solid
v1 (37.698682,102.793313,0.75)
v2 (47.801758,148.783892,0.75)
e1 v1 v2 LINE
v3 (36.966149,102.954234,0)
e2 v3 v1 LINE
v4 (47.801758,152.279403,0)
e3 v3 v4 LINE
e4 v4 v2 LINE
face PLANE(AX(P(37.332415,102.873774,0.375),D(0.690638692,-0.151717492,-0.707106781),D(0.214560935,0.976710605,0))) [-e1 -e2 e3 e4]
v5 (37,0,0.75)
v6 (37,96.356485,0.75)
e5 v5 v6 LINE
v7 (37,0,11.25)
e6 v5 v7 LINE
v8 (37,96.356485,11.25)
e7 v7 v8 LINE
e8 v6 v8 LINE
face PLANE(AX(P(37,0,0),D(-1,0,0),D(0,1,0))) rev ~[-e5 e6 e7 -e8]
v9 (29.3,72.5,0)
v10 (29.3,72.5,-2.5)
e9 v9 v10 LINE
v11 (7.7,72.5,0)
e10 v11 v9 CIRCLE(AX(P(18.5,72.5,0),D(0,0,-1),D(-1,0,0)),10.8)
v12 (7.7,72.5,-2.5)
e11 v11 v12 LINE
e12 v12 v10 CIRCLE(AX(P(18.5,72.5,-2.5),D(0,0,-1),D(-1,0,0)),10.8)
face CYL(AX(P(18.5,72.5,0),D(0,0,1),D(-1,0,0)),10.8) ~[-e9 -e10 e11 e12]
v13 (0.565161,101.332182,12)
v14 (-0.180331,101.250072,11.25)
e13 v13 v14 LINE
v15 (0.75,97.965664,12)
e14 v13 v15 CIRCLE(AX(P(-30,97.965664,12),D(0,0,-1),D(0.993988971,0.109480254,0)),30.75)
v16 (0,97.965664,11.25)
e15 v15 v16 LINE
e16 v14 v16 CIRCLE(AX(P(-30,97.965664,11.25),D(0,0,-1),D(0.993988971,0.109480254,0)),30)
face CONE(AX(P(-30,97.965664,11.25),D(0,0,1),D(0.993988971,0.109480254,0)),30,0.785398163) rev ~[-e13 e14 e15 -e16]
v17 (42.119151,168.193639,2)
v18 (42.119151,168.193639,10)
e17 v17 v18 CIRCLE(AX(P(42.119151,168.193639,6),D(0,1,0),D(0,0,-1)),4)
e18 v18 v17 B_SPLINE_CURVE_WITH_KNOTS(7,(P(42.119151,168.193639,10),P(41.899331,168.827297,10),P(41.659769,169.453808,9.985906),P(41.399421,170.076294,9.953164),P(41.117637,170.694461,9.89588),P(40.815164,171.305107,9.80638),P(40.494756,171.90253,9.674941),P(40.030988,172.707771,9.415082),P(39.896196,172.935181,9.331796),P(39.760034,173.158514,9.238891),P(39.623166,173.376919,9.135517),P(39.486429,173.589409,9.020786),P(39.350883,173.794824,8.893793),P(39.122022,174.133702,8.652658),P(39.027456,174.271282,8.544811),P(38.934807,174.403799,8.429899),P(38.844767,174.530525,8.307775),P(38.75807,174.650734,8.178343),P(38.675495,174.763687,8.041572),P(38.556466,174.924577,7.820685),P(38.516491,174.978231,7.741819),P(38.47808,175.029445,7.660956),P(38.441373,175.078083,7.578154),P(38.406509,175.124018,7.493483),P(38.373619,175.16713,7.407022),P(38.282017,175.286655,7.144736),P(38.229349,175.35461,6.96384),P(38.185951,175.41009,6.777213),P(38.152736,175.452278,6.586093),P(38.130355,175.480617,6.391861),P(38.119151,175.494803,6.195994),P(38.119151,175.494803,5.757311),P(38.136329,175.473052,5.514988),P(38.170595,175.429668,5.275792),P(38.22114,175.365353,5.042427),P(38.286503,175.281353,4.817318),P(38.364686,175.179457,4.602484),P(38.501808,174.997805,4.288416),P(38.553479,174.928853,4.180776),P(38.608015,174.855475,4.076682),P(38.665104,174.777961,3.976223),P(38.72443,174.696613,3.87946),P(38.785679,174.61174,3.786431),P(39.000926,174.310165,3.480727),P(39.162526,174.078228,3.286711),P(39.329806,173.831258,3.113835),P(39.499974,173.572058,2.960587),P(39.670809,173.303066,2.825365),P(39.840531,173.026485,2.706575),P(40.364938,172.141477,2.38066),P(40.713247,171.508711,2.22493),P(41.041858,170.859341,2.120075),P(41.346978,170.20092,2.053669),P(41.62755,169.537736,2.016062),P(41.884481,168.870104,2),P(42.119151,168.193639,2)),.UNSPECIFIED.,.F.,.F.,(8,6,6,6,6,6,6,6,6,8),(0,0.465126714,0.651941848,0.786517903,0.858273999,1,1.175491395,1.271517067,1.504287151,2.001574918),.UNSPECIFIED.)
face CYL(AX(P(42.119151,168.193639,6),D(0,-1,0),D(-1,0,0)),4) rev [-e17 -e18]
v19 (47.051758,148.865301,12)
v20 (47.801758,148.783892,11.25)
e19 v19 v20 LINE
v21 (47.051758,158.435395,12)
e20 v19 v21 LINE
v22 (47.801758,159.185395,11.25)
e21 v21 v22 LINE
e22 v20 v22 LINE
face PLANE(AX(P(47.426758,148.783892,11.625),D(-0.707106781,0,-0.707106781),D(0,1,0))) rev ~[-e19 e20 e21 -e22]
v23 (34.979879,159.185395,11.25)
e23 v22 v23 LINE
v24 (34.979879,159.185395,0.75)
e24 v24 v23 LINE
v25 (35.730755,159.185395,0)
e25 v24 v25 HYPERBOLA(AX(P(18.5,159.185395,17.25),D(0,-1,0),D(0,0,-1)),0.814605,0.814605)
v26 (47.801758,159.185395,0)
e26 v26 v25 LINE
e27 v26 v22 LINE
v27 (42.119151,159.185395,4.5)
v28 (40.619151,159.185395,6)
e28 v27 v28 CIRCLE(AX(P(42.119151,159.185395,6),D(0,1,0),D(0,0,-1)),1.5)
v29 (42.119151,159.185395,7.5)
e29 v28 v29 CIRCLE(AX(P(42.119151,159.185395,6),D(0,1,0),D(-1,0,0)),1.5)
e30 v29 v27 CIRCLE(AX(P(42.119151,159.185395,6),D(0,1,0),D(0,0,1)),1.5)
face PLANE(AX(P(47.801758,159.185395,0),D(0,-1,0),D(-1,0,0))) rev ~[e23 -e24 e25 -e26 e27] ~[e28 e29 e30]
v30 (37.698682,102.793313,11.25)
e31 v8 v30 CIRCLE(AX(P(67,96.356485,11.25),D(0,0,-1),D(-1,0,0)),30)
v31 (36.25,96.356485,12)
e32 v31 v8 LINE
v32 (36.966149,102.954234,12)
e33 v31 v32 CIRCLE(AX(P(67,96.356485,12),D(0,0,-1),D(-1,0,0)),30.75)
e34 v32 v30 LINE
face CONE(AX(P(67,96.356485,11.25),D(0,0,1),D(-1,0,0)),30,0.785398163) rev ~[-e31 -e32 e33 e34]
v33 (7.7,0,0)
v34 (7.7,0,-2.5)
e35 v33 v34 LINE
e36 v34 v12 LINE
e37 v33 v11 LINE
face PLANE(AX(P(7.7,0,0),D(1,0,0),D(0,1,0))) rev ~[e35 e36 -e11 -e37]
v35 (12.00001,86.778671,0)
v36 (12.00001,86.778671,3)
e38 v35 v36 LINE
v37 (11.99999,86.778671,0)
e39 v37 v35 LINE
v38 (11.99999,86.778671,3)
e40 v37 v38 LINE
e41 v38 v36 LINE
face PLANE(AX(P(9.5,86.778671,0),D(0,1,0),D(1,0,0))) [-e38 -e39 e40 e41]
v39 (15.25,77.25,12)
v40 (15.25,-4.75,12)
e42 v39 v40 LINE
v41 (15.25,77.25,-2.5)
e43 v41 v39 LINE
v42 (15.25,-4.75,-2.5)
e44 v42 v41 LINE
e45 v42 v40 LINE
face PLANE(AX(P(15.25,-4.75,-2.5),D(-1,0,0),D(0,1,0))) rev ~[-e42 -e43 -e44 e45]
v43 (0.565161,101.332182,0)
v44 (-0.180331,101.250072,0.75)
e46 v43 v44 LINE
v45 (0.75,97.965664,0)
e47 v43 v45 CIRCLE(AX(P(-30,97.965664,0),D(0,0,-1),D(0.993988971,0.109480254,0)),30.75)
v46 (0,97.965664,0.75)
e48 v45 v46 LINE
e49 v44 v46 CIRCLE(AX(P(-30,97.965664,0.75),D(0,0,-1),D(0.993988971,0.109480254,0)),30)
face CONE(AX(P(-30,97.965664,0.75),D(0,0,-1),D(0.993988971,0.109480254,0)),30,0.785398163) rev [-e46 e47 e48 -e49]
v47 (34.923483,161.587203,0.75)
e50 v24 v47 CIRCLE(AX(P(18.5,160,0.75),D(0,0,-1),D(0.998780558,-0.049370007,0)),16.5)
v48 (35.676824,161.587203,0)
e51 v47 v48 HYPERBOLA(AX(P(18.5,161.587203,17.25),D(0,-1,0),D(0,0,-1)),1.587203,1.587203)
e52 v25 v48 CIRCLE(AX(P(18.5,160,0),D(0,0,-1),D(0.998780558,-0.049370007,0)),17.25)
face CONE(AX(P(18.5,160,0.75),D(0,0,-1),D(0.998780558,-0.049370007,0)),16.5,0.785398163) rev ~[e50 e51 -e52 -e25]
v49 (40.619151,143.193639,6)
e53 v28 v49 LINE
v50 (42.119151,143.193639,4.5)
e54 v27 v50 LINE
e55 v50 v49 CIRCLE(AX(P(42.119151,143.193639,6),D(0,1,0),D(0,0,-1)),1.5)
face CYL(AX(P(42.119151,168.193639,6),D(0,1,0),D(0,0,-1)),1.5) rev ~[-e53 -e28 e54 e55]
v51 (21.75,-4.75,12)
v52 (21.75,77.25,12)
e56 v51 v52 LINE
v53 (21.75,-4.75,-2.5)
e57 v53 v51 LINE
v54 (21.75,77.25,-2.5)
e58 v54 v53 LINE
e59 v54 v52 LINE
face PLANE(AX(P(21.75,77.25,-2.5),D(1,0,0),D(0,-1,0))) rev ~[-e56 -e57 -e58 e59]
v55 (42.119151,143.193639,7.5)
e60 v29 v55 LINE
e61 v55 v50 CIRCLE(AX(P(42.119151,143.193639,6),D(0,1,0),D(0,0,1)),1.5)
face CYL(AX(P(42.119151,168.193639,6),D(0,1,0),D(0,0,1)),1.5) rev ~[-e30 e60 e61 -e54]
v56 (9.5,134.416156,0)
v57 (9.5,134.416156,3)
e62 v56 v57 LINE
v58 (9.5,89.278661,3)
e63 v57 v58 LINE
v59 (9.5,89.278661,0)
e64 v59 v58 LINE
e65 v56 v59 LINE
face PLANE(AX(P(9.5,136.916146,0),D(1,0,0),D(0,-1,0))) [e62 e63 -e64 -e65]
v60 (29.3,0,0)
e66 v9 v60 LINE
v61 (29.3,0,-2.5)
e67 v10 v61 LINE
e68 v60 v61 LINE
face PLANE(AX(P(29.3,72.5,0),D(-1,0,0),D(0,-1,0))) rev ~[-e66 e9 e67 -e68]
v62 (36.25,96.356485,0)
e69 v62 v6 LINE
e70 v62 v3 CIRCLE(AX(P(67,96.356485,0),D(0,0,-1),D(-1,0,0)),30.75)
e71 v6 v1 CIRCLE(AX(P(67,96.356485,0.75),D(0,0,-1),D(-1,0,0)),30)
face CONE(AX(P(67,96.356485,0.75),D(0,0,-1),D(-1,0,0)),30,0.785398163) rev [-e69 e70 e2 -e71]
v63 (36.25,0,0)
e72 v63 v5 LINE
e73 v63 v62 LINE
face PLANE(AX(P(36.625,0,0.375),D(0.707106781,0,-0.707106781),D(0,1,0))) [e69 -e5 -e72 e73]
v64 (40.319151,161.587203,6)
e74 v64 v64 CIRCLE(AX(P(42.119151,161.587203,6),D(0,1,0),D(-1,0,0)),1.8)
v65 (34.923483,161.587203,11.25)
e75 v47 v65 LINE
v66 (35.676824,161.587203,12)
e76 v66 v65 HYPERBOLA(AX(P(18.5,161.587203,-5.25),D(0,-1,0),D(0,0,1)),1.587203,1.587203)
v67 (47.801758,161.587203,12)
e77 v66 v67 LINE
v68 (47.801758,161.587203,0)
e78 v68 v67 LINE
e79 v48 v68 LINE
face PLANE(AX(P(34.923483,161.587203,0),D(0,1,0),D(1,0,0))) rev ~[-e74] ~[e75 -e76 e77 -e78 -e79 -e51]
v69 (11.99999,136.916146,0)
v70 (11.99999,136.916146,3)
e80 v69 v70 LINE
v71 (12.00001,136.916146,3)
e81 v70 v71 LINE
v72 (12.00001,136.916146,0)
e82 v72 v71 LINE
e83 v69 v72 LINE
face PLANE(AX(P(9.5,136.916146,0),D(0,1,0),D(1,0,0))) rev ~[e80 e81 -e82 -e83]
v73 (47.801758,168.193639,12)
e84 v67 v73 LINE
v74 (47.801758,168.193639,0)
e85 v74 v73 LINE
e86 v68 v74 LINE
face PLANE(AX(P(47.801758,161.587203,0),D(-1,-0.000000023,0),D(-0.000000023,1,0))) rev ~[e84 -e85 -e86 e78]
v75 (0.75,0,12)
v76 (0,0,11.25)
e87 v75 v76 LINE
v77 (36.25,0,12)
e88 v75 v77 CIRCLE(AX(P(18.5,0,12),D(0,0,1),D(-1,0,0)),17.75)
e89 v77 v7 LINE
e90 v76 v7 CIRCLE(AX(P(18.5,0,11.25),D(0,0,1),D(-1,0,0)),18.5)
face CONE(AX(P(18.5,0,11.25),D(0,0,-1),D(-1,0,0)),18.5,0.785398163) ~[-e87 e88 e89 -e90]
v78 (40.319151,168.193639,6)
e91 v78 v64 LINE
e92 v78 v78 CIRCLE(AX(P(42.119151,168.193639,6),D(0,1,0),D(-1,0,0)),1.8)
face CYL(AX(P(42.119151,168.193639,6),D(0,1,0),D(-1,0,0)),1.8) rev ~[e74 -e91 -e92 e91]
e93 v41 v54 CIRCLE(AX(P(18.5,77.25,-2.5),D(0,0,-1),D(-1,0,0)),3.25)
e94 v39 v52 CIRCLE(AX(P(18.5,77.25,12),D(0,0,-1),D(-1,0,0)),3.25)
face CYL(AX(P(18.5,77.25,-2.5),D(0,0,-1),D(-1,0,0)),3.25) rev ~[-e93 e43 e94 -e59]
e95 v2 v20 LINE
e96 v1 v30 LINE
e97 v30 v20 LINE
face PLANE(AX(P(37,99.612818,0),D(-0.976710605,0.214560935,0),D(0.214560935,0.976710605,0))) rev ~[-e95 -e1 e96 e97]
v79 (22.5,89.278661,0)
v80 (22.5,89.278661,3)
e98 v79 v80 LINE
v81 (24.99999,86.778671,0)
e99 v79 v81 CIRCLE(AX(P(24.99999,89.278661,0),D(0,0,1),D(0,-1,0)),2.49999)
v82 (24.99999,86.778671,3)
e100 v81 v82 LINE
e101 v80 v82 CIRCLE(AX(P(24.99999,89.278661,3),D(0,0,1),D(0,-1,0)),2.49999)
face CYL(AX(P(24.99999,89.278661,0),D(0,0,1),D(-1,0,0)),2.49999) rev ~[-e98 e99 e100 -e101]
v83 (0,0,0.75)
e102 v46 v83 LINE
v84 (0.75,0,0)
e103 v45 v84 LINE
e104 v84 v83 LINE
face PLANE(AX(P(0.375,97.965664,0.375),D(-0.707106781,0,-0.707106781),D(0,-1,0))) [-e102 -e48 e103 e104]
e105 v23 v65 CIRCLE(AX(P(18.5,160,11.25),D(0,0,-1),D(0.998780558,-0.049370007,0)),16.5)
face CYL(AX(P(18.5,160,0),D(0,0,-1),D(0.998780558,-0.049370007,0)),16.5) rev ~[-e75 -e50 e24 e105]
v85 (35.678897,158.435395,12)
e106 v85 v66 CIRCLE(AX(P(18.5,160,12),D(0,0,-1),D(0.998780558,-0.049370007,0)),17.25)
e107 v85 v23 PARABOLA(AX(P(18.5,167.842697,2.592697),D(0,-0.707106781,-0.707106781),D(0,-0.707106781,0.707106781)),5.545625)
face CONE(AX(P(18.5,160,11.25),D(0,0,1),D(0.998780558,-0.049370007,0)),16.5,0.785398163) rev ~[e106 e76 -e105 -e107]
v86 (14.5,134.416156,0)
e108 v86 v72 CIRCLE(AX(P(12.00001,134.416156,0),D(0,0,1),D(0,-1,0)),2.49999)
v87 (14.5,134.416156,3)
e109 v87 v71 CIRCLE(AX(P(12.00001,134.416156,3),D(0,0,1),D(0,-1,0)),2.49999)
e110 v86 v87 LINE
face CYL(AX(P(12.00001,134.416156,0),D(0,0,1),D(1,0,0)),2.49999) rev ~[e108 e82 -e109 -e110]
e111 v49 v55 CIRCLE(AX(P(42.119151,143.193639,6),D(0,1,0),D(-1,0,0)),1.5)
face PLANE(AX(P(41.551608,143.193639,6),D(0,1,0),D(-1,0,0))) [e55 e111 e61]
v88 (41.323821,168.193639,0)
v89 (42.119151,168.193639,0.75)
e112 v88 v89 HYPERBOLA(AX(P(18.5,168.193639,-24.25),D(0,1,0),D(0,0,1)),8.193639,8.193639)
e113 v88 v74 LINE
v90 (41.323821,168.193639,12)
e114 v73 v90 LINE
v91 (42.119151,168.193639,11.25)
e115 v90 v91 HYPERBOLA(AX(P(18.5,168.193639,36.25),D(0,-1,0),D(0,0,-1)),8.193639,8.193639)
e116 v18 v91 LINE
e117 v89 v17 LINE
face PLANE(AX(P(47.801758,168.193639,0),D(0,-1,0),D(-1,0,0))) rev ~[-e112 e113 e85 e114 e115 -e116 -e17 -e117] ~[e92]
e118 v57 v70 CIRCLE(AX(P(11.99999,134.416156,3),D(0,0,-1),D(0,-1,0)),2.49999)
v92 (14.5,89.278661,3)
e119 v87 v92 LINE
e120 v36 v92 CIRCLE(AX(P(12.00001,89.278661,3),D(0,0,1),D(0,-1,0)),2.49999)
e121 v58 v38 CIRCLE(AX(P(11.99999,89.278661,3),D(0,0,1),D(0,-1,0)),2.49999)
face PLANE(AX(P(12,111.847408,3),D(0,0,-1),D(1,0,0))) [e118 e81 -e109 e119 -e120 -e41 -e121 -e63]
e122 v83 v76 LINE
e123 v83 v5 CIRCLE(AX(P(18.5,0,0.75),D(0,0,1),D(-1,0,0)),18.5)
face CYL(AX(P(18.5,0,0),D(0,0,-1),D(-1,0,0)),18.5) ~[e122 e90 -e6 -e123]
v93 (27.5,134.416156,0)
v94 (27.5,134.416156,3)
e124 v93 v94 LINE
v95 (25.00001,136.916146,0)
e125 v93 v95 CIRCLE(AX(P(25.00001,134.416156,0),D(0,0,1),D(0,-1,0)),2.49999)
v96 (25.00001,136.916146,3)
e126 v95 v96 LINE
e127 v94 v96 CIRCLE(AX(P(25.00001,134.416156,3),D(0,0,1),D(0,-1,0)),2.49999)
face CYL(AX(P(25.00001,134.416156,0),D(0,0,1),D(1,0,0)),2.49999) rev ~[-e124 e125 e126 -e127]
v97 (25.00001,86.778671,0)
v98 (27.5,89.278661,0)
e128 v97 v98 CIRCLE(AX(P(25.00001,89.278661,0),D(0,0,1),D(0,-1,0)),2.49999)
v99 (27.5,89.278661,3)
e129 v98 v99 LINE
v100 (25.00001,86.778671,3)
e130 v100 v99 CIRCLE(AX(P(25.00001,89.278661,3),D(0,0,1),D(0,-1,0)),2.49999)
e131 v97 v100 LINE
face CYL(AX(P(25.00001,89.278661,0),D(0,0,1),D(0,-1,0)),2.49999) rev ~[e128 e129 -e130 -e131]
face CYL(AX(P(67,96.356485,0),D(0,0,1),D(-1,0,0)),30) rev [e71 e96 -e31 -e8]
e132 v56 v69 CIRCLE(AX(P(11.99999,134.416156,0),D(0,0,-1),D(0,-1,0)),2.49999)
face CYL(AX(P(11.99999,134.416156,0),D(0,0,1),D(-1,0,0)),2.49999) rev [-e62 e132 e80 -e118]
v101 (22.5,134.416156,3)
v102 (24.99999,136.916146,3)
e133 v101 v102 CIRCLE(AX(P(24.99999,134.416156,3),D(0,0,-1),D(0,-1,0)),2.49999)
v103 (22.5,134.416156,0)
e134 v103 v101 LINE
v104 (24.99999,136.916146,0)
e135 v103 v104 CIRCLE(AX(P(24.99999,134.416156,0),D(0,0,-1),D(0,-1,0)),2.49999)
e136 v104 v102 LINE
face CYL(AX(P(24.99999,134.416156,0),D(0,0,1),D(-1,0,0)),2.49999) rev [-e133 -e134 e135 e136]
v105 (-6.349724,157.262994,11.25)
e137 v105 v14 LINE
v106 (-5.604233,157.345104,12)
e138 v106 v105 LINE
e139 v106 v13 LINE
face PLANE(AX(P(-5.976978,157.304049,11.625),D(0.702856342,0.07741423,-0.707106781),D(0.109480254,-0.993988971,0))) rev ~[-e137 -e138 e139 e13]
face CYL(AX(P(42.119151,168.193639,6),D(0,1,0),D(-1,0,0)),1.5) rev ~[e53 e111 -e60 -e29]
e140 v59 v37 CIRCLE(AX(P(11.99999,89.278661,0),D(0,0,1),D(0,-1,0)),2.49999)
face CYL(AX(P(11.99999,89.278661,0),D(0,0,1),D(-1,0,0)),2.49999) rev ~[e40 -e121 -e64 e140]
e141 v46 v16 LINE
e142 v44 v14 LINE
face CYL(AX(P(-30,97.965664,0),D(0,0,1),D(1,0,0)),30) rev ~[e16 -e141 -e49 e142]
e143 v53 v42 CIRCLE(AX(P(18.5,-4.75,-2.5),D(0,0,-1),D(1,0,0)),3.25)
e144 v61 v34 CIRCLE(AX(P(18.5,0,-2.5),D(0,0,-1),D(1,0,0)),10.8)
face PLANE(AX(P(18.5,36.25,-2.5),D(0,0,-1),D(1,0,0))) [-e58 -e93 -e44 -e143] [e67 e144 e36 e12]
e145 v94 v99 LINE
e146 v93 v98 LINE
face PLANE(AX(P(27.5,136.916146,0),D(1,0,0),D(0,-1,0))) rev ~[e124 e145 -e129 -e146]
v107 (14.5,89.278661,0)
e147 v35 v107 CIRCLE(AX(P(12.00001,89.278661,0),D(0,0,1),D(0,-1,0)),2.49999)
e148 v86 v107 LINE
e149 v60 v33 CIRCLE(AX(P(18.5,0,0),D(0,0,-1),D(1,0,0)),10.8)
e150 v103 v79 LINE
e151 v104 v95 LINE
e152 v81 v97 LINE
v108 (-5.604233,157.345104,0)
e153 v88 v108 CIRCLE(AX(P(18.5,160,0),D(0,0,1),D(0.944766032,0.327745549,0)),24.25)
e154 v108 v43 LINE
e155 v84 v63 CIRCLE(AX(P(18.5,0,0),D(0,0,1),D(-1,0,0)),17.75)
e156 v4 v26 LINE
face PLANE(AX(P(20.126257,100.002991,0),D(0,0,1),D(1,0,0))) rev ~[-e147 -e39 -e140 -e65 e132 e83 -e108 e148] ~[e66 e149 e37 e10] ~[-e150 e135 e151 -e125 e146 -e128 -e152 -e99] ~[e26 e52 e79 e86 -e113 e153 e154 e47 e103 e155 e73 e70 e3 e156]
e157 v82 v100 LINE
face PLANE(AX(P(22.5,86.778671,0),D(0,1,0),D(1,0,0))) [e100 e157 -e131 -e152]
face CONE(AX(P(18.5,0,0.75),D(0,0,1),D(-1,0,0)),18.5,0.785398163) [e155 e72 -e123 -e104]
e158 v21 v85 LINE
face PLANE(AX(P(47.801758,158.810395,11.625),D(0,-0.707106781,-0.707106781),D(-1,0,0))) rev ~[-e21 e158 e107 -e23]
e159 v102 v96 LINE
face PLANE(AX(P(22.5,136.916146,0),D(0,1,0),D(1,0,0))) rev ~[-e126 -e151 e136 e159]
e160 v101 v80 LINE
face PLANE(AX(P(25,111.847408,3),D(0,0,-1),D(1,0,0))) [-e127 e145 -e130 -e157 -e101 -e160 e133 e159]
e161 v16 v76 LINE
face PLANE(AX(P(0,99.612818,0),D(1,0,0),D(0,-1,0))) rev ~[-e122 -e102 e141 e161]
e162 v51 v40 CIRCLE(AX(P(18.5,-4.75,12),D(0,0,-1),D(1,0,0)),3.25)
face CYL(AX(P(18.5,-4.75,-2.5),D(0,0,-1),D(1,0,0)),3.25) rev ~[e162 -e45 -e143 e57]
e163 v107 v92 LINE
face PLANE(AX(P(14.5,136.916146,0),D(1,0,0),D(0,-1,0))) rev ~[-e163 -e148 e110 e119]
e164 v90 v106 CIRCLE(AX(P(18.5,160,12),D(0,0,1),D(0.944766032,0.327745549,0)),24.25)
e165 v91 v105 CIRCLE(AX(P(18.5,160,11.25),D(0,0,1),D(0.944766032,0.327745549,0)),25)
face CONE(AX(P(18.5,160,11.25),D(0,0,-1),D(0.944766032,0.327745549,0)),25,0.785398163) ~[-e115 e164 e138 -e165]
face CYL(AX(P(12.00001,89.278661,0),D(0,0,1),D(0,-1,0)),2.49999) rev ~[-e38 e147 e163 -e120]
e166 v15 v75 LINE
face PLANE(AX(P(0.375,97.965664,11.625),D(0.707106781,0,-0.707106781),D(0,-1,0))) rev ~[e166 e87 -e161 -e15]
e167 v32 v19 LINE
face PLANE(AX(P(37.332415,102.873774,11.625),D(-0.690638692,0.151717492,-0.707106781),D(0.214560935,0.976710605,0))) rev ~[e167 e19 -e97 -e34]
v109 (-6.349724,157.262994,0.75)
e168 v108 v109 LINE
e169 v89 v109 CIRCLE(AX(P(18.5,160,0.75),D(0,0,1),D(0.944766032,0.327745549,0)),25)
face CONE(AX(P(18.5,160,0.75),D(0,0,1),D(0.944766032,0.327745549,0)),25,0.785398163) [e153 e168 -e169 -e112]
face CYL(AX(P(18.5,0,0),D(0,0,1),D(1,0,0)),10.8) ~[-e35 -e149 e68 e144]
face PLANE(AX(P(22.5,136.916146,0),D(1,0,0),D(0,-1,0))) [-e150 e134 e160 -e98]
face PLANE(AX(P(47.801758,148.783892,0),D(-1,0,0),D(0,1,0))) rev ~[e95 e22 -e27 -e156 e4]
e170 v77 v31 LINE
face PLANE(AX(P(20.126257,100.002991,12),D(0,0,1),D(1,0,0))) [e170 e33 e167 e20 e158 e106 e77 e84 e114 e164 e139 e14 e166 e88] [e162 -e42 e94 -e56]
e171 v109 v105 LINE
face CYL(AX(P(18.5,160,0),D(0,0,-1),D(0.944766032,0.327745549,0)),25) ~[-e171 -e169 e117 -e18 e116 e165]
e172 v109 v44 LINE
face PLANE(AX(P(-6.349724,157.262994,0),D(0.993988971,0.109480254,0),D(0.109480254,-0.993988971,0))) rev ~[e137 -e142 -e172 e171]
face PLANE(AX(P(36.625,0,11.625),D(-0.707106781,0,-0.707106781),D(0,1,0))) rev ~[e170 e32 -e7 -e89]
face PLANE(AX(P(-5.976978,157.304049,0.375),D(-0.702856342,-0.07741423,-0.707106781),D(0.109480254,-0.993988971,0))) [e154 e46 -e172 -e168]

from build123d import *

# Parameters (mm, degrees)
F1_DEPTH      = 12
F3_DEPTH      = 2.5
F5_DEPTH      = 25
F6_R          = 30
F8_DEPTH      = 25
F8_DEPTH_BACK = 25
F9_R          = 4
F10_DEPTH     = 25
F11_R         = 1.8
F12_DEPTH     = 7.5
F13_SIZE      = 0.75
F14_SIZE      = 0.75
F15_SIZE      = 0.75
F16_W         = 5
F16_H         = 50.1374751329
F17_DEPTH     = 3
F18_R         = 2.49999


# Not quite as in the source:
# - a fillet or chamfer is up to 0.001 mm smaller than in the source, because OpenCascade refuses the exact size


with BuildPart() as f1:
    # F0 (on Top) → F1 (new body)
    with BuildSketch(Plane.XY):
        with BuildLine():
            Line((-3.74e-08, 99.6128183121), (0, 0))
            ThreePointArc((0, 0), (18.500000007, -18.499999993), (37, 1.39e-08))
            Line((37, 1.39e-08), (36.9999999626, 99.6128183121))
            Line((36.9999999626, 99.6128183121), (47.8017579937, 148.7838923931))
            Line((47.8017579937, 148.7838923931), (47.8017579937, 159.1853948904))
            Line((47.8017579937, 159.1853948904), (34.9798792017, 159.1853948904))
            ThreePointArc((34.9798792017, 159.1853948904), (2.004546746, 159.6126733438), (34.9234827971, 161.5872028336))
            Line((34.9234827971, 161.5872028336), (47.8017579834, 161.5872028336))
            Line((47.8017579834, 161.5872028336), (47.8017578313, 168.1936387276))
            Line((47.8017578313, 168.1936387276), (42.1191508, 168.1936387276))
            ThreePointArc((42.1191508, 168.1936387276), (13.0001519828, 184.387531079), (-6.3497242683, 157.2629936512))
            Line((-6.3497242683, 157.2629936512), (-3.74e-08, 99.6128183121))
        make_face()
    extrude(amount=F1_DEPTH)

    # F2 (on face) → F3 (join)
    with BuildSketch(Plane(origin=(0, 0, 0), x_dir=(1, 0, 0), z_dir=(0, 0, -1))):
        with BuildLine():
            ThreePointArc((29.3, -7e-09), (18.5, 10.799999993), (7.7, -7e-09))
            Line((7.7, -7e-09), (7.7, -72.500000007))
            ThreePointArc((7.7, -72.500000007), (18.5, -83.300000007), (29.3, -72.500000007))
            Line((29.3, -72.500000007), (29.3, -7e-09))
        make_face()
    extrude(amount=F3_DEPTH)

    # F4 (on face) → F5 (cut)
    with BuildSketch(Plane(origin=(0, 0, -2.5), x_dir=(1, 0, 0), z_dir=(0, 0, -1))):
        with BuildLine():
            ThreePointArc((21.75, 4.749999993), (18.5, 7.999999993), (15.25, 4.749999993))
            Line((15.25, 4.749999993), (15.25, -77.250000007))
            ThreePointArc((15.25, -77.250000007), (18.5, -80.500000007), (21.75, -77.250000007))
            Line((21.75, -77.250000007), (21.75, 4.749999993))
        make_face()
    extrude(amount=-F5_DEPTH, mode=Mode.SUBTRACT)

    # F6
    f6_edges = [f1.edges().sort_by_distance(p)[0] for p in [
        (0, 99.612818, 6),
        (37, 99.612818, 6),
    ]]
    fillet(f6_edges, radius=F6_R)

    # F7 (on face) → F8 (cut, two sides)
    with BuildSketch(Plane(origin=(0, 168.1936387276, 0), x_dir=(-1, 0, 0), z_dir=(0, 1, 0))) as f8_sk:
        with BuildLine():
            ThreePointArc((-42.1191508, 4.5), (-41.0584906283, 4.9393398282), (-40.6191508, 6))
            ThreePointArc((-40.6191508, 6), (-41.0584906283, 7.0606601718), (-42.1191508, 7.5))
            Line((-42.1191508, 7.5), (-42.1191508, 4.5))
        make_face()
        with BuildLine():
            Line((-42.1191508, 4.5), (-42.1191508, 7.5))
            ThreePointArc((-42.1191508, 7.5), (-43.6191508, 6), (-42.1191508, 4.5))
        make_face()
    extrude(amount=-F8_DEPTH, mode=Mode.SUBTRACT)
    extrude(f8_sk.sketch, amount=F8_DEPTH_BACK, mode=Mode.SUBTRACT)

    # F9 (on face) → F10 (cut)
    with BuildSketch(Plane(origin=(0, 168.1936387276, 0), x_dir=(-1, 0, 0), z_dir=(0, 1, 0))):
        with Locations((-42.1191508, 6)):
            Circle(F9_R)
    extrude(amount=F10_DEPTH, mode=Mode.SUBTRACT)

    # F11 (on face) → F12 (cut)
    with BuildSketch(Plane(origin=(0, 168.1936387276, 0), x_dir=(-1, 0, 0), z_dir=(0, 1, 0))):
        with Locations((-42.1191508, 6)):
            Circle(F11_R)
    extrude(amount=-F12_DEPTH, mode=Mode.SUBTRACT)

    # F13
    f13_edges = [f1.edges().sort_by_distance(p)[0] for p in [
        (37, 48.178243, 12),
        (41.390819, 159.185395, 12),
        (2.004547, 159.612673, 12),
        (47.801758, 153.984644, 12),
    ]]
    chamfer(f13_edges, length=F13_SIZE)

    # F14
    f14_edges = [f1.edges().sort_by_distance(p)[0] for p in [
        (2.004547, 159.612673, 0),
    ]]
    chamfer(f14_edges, length=F14_SIZE)

    # F15
    f15_edges = [f1.edges().sort_by_distance(p)[0] for p in [
        (42.75022, 125.788603, 0),
        (13.000152, 184.387531, 0),
        (-3.265028, 129.256533, 0),
        (37.175182, 99.593803, 0),
        (-0.045117, 99.610341, 0),
        (37, 48.178243, 0),
        (0, 48.982832, 0),
        (18.5, -18.5, 0),
    ]]
    chamfer(f15_edges, length=F15_SIZE)

    # F16 (on face) → F17 (cut)
    with BuildSketch(Plane(origin=(0, 0, 0), x_dir=(1, 0, 0), z_dir=(0, 0, -1))):
        with Locations((25, -111.8474081159)):
            Rectangle(F16_W, F16_H)
        with Locations((12, -111.8474081159)):
            Rectangle(F16_W, F16_H)
    extrude(amount=-F17_DEPTH, mode=Mode.SUBTRACT)

    # F18 (radius 2.5 in the source; OpenCascade refuses exactly that, so slightly less here)
    f18_edges = [f1.edges().sort_by_distance(p)[0] for p in [
        (22.5, 136.916146, 1.5),
        (27.5, 136.916146, 1.5),
        (14.5, 136.916146, 1.5),
        (9.5, 136.916146, 1.5),
        (9.5, 86.778671, 1.5),
        (14.5, 86.778671, 1.5),
        (27.5, 86.778671, 1.5),
        (22.5, 86.778671, 1.5),
    ]]
    fillet(f18_edges, radius=F18_R)


solid = f1.part
